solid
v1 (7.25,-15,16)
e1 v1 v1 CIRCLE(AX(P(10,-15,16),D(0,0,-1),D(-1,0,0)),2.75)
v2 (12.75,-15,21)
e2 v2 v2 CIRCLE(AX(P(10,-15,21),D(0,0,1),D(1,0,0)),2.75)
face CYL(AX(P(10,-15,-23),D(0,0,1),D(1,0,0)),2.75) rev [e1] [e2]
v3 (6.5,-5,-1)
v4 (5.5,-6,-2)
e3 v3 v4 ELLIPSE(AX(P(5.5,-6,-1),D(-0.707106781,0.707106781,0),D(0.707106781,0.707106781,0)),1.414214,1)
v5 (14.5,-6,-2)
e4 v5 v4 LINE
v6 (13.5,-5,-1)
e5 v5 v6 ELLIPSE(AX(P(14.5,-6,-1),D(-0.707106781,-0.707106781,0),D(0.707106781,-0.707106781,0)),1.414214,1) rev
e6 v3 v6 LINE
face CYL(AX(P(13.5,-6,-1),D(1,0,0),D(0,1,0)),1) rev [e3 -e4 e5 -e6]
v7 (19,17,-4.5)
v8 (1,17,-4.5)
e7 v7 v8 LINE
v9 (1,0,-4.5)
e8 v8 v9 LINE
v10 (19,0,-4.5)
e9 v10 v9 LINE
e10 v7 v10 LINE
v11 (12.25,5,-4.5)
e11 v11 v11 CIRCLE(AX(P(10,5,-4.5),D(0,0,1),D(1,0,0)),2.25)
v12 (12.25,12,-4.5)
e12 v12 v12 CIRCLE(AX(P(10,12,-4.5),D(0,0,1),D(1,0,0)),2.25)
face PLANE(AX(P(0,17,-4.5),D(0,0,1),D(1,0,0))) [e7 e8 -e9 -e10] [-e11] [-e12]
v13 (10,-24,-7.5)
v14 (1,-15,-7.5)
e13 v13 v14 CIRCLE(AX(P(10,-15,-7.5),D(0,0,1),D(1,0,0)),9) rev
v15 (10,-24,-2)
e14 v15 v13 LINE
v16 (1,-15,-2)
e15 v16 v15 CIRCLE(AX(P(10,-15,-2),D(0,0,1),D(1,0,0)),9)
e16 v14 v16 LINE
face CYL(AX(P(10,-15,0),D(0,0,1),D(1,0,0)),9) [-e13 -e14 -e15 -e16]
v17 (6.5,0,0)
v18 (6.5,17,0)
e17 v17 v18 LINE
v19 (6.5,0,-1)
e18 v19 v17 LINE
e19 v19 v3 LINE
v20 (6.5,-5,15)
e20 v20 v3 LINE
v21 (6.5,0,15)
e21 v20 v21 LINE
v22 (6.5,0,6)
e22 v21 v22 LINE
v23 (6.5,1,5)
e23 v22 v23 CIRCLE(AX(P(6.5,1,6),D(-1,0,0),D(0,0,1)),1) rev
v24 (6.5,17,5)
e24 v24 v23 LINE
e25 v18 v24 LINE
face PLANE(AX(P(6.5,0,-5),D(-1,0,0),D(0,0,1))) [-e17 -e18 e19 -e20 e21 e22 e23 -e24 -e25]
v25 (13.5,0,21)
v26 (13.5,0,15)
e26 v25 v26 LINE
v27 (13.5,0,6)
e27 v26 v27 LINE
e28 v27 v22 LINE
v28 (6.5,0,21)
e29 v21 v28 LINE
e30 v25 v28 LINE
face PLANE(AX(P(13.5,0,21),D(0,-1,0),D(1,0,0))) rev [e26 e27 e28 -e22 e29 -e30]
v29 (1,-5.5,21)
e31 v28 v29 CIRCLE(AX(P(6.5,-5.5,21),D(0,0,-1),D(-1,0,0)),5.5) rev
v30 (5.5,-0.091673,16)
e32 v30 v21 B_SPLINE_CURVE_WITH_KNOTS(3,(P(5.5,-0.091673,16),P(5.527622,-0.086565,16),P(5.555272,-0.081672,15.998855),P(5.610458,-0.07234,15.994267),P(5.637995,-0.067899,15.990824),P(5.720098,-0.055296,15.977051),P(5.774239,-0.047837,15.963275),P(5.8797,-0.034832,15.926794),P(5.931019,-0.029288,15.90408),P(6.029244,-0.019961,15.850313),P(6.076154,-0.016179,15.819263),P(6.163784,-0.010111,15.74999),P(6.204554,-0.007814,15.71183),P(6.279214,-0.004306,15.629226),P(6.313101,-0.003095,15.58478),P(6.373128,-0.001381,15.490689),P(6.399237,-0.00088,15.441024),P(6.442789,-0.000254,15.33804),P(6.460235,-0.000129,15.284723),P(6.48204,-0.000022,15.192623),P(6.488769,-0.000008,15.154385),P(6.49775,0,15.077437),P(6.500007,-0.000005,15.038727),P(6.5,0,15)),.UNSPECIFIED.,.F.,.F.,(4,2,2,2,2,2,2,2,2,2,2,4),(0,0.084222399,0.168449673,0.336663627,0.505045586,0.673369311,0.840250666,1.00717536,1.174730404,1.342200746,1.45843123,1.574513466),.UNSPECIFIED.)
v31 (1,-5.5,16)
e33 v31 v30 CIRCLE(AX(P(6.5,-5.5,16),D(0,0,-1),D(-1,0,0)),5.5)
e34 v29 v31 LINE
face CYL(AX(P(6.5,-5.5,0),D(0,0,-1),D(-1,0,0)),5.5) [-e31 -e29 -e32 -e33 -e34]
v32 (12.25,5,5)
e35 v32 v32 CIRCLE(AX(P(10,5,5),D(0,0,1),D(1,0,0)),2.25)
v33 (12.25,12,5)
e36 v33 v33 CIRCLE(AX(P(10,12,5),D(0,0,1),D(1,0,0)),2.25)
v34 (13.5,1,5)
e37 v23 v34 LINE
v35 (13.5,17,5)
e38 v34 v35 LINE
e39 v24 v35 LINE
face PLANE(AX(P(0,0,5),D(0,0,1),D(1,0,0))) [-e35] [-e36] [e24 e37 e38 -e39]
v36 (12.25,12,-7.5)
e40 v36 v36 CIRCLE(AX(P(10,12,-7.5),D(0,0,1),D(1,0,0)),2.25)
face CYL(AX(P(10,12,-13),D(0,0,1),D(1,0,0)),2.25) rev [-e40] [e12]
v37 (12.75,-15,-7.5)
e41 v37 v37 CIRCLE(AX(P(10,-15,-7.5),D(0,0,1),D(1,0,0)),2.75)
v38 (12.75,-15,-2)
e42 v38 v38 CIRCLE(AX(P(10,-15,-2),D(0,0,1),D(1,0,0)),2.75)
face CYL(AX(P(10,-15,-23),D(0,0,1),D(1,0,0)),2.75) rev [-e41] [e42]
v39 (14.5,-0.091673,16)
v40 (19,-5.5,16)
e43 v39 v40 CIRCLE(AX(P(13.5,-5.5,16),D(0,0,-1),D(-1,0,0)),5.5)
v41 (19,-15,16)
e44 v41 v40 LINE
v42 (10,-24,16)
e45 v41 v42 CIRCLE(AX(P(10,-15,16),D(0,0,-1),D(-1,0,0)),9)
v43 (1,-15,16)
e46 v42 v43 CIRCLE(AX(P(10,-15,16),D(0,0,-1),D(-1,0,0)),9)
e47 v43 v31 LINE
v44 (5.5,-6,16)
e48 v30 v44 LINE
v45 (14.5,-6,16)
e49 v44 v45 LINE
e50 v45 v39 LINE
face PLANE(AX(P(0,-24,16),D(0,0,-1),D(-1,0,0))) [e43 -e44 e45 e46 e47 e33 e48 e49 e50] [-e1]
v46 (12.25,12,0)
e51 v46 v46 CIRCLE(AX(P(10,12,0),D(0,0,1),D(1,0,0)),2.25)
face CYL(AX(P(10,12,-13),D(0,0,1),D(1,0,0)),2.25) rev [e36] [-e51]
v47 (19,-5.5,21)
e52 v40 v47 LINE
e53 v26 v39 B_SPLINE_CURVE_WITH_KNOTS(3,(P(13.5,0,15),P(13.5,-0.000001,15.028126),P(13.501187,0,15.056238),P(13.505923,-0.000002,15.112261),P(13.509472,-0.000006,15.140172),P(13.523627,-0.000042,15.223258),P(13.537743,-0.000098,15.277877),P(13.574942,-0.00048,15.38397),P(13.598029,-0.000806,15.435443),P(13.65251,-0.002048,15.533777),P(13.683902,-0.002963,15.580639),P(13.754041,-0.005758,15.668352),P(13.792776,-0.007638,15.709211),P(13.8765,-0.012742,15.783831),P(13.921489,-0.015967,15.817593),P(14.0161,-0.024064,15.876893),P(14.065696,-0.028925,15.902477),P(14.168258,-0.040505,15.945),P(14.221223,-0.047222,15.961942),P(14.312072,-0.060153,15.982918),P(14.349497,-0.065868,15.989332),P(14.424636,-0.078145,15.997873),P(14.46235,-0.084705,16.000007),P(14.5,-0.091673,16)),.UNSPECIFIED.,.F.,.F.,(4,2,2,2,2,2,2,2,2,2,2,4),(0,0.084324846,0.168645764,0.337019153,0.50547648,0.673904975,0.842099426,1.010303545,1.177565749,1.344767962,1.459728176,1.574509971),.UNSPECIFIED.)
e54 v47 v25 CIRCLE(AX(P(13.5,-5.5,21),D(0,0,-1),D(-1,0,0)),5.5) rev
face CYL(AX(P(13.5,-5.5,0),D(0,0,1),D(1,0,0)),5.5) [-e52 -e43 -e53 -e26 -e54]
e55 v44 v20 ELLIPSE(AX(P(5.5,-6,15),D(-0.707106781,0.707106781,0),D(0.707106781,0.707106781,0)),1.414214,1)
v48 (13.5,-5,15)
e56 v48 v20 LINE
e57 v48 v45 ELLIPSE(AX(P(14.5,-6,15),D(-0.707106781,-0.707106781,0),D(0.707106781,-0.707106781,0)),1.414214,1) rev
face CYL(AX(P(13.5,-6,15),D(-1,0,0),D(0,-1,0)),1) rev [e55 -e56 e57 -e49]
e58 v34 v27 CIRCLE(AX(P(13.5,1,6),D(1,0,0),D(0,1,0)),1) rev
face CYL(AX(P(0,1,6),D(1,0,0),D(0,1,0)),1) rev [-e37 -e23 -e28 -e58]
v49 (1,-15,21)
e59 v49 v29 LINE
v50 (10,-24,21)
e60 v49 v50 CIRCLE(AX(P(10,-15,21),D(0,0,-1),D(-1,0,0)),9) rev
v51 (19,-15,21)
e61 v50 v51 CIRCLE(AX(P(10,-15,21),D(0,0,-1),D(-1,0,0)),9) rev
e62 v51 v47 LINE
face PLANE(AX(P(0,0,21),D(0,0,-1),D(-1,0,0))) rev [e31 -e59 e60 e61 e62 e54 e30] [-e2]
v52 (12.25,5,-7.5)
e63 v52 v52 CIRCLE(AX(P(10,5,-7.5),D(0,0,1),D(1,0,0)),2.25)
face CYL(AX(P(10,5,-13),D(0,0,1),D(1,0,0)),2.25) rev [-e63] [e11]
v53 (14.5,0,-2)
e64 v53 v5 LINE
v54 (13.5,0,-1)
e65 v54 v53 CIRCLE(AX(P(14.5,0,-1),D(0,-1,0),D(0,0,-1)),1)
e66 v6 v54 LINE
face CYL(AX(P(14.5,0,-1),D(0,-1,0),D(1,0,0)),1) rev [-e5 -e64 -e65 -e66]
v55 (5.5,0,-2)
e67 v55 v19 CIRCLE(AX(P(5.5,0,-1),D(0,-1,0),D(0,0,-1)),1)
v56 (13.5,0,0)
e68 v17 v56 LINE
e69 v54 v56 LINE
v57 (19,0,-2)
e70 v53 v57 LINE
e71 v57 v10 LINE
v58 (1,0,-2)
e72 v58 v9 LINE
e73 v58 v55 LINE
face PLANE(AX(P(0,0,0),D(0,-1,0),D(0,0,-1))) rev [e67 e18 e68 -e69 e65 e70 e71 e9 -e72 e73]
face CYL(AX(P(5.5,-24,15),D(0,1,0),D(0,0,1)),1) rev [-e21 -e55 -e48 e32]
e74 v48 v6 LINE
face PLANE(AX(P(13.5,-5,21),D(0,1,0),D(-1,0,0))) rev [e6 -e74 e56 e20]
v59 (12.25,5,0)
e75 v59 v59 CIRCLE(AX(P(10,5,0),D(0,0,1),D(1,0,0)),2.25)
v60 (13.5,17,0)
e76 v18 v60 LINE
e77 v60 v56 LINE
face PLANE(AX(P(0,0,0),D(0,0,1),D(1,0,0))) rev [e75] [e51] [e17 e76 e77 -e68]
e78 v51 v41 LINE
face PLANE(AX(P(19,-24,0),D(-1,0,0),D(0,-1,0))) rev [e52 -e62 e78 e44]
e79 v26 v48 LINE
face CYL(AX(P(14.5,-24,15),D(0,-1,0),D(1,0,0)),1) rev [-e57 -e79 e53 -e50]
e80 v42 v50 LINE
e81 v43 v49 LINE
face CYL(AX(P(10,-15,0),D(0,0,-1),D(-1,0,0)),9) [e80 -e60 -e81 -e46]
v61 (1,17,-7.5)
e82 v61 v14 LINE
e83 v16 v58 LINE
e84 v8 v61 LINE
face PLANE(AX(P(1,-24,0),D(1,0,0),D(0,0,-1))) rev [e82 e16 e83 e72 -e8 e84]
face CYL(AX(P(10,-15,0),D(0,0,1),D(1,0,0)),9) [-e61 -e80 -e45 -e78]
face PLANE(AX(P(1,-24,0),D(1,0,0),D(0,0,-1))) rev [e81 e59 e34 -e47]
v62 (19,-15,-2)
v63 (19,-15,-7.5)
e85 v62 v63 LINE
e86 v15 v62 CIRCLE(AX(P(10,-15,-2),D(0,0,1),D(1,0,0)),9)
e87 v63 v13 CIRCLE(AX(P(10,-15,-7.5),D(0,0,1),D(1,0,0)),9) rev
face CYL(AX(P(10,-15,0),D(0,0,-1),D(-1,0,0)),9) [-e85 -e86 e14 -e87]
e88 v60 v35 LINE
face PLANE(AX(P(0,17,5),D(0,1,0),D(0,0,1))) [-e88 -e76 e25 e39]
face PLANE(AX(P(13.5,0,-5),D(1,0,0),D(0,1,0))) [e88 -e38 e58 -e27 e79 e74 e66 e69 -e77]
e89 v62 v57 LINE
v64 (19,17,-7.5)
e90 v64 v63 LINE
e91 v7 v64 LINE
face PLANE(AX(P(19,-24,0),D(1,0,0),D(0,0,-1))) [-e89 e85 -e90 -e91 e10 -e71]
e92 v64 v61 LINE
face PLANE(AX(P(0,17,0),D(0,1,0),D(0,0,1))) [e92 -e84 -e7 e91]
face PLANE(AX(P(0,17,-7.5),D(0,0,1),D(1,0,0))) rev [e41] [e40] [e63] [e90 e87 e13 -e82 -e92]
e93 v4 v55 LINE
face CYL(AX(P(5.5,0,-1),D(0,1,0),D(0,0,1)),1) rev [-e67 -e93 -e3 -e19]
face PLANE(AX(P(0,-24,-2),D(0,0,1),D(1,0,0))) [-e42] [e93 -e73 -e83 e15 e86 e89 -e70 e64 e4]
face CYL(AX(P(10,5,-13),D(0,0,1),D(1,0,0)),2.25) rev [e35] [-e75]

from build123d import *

# Parameters (mm, degrees)
ESQUISSE1_W             = 20
ESQUISSE1_H             = 17
ESQUISSE1_R             = 2.1
BOSS_EXTRU_1_DEPTH      = 5
ESQUISSE2_W             = 18
ESQUISSE2_H             = 3
BOSS_EXTRU_3_DEPTH      = 24
ESQUISSE5_W             = 6.5
ESQUISSE5_H             = 17
ENL_V_MAT_EXTRU_3_DEPTH = 18
ESQUISSE10_W            = 7
ESQUISSE10_H            = 3
BOSS_EXTRU_6_DEPTH      = 10
ESQUISSE11_W            = 5.5
ESQUISSE11_H            = 2.5
ESQUISSE11_W_2          = 7
ESQUISSE11_H_2          = 0.5
BOSS_EXTRU_7_DEPTH      = 17
ESQUISSE12_W            = 18
ESQUISSE12_H            = 2.5
BOSS_EXTRU_8_DEPTH      = 24
CONG_3_R                = 9
ESQUISSE20_R            = 2.25
ENL_V_MAT_EXTRU_7_DEPTH = 18
ESQUISSE22_W            = 7
ESQUISSE22_H            = 5
BOSS_EXTRU_9_DEPTH      = 23
ESQUISSE27_W            = 5.5
ESQUISSE27_H            = 5
ESQUISSE27_W_2          = 7
BOSS_EXTRU_10_DEPTH     = 24
CONG_4_R                = 9
ESQUISSE28_R            = 2.75
ENL_V_MAT_EXTRU_8_DEPTH = 44
CONG_5_R                = 1
CONG_6_R                = 5.5


with BuildPart() as part:
    # Esquisse1 → Boss.-Extru.1 (new body)
    with BuildSketch(Plane.XY):
        with Locations((10, 8.5)):
            Rectangle(ESQUISSE1_W, ESQUISSE1_H)
        with Locations((10, 5)):
            Circle(ESQUISSE1_R, mode=Mode.SUBTRACT)
        with Locations((10, 12)):
            Circle(ESQUISSE1_R, mode=Mode.SUBTRACT)
    extrude(amount=BOSS_EXTRU_1_DEPTH)

    # Esquisse5 → Enlèv. mat.-Extru.3 (cut)
    with BuildSketch(Plane.XY.offset(5)):
        with Locations((16.75, 8.5)):
            Rectangle(ESQUISSE5_W, ESQUISSE5_H)
        with Locations((3.25, 8.5)):
            Rectangle(ESQUISSE5_W, ESQUISSE5_H)
    extrude(amount=-ENL_V_MAT_EXTRU_3_DEPTH, mode=Mode.SUBTRACT)



with BuildPart() as body_2:
    # Esquisse2 → Boss.-Extru.3 (new body)
    with BuildSketch(Plane.XZ):
        with Locations((10, -3.5)):
            Rectangle(ESQUISSE2_W, ESQUISSE2_H)
    extrude(amount=BOSS_EXTRU_3_DEPTH)


with BuildPart() as part_1:
    add(part.part)

    add(body_2.part)  # Boss.-Extru.6 merges body 2
    # Esquisse10 → Boss.-Extru.6 (add)
    with BuildSketch(Plane.XY.offset(5)):
        with Locations((10, -1.5)):
            Rectangle(ESQUISSE10_W, ESQUISSE10_H)
    extrude(amount=-BOSS_EXTRU_6_DEPTH)

    # Esquisse11 → Boss.-Extru.7 (add)
    with BuildSketch(Plane(origin=(0, 0, 0), x_dir=(1, 0, 0), z_dir=(0, 1, 0))):
        with Locations((3.75, 6.25)):
            Rectangle(ESQUISSE11_W, ESQUISSE11_H)
        with Locations((10, 6.25)):
            Rectangle(ESQUISSE11_W_2, ESQUISSE11_H)
        with Locations((16.25, 6.25)):
            Rectangle(ESQUISSE11_W, ESQUISSE11_H)
        with Locations((3.75, 4.75)):
            Rectangle(ESQUISSE11_W, ESQUISSE11_H_2)
        with Locations((10, 4.75)):
            Rectangle(ESQUISSE11_W_2, ESQUISSE11_H_2)
        with Locations((16.25, 4.75)):
            Rectangle(ESQUISSE11_W, ESQUISSE11_H_2)
    extrude(amount=BOSS_EXTRU_7_DEPTH)

    # Esquisse12 → Boss.-Extru.8 (add)
    with BuildSketch(Plane.XZ):
        with Locations((10, -6.25)):
            Rectangle(ESQUISSE12_W, ESQUISSE12_H)
    extrude(amount=BOSS_EXTRU_8_DEPTH)

    # Congé3
    cong_3_edges = [part_1.edges().sort_by_distance(p)[0] for p in [
        (19, -24, -4.75),
        (1, -24, -4.75),
    ]]
    fillet(cong_3_edges, radius=CONG_3_R - 0.0001)  # a hair under: the kernel refuses the full size

    # Esquisse20 → Enlèv. mat.-Extru.7 (cut)
    with BuildSketch(Plane.XY.offset(5)):
        with Locations((10, 5)):
            Circle(ESQUISSE20_R)
        with Locations((10, 12)):
            Circle(ESQUISSE20_R)
    extrude(amount=-ENL_V_MAT_EXTRU_7_DEPTH, mode=Mode.SUBTRACT)

    # Esquisse22 → Boss.-Extru.9 (add)
    with BuildSketch(Plane.XY.offset(-2)):
        with Locations((10, -2.5)):
            Rectangle(ESQUISSE22_W, ESQUISSE22_H)
    extrude(amount=BOSS_EXTRU_9_DEPTH)

    # Esquisse27 → Boss.-Extru.10 (add)
    with BuildSketch(Plane(origin=(0, 0, 0), x_dir=(1, 0, 0), z_dir=(0, 1, 0))):
        with Locations((3.75, -18.5)):
            Rectangle(ESQUISSE27_W, ESQUISSE27_H)
        with Locations((16.25, -18.5)):
            Rectangle(ESQUISSE27_W, ESQUISSE27_H)
        with Locations((10, -18.5)):
            Rectangle(ESQUISSE27_W_2, ESQUISSE27_H)
    extrude(amount=-BOSS_EXTRU_10_DEPTH)

    # Congé4
    cong_4_edges = [part_1.edges().sort_by_distance(p)[0] for p in [
        (1, -24, 18.5),
        (19, -24, 18.5),
    ]]
    fillet(cong_4_edges, radius=CONG_4_R - 0.0001)  # a hair under: the kernel refuses the full size

    # Esquisse28 → Enlèv. mat.-Extru.8 (cut)
    with BuildSketch(Plane.XY.offset(21)):
        with Locations((10, -15)):
            Circle(ESQUISSE28_R)
    extrude(amount=-ENL_V_MAT_EXTRU_8_DEPTH, mode=Mode.SUBTRACT)

    # Congé5
    cong_5_edges = [part_1.edges().sort_by_distance(p)[0] for p in [
        (10, 0, 5),
        (10, -5, -2),
        (10, -5, 16),
        (6.5, -2.5, 16),
        (13.5, -2.5, 16),
        (6.5, -2.5, -2),
        (13.5, -2.5, -2),
    ]]
    fillet(cong_5_edges, radius=CONG_5_R)

    # Congé6
    cong_6_edges = [part_1.edges().sort_by_distance(p)[0] for p in [
        (1, 0, 18.5),
        (19, 0, 18.5),
    ]]
    fillet(cong_6_edges, radius=CONG_6_R - 0.0001)  # a hair under: the kernel refuses the full size


solid = part_1.part
